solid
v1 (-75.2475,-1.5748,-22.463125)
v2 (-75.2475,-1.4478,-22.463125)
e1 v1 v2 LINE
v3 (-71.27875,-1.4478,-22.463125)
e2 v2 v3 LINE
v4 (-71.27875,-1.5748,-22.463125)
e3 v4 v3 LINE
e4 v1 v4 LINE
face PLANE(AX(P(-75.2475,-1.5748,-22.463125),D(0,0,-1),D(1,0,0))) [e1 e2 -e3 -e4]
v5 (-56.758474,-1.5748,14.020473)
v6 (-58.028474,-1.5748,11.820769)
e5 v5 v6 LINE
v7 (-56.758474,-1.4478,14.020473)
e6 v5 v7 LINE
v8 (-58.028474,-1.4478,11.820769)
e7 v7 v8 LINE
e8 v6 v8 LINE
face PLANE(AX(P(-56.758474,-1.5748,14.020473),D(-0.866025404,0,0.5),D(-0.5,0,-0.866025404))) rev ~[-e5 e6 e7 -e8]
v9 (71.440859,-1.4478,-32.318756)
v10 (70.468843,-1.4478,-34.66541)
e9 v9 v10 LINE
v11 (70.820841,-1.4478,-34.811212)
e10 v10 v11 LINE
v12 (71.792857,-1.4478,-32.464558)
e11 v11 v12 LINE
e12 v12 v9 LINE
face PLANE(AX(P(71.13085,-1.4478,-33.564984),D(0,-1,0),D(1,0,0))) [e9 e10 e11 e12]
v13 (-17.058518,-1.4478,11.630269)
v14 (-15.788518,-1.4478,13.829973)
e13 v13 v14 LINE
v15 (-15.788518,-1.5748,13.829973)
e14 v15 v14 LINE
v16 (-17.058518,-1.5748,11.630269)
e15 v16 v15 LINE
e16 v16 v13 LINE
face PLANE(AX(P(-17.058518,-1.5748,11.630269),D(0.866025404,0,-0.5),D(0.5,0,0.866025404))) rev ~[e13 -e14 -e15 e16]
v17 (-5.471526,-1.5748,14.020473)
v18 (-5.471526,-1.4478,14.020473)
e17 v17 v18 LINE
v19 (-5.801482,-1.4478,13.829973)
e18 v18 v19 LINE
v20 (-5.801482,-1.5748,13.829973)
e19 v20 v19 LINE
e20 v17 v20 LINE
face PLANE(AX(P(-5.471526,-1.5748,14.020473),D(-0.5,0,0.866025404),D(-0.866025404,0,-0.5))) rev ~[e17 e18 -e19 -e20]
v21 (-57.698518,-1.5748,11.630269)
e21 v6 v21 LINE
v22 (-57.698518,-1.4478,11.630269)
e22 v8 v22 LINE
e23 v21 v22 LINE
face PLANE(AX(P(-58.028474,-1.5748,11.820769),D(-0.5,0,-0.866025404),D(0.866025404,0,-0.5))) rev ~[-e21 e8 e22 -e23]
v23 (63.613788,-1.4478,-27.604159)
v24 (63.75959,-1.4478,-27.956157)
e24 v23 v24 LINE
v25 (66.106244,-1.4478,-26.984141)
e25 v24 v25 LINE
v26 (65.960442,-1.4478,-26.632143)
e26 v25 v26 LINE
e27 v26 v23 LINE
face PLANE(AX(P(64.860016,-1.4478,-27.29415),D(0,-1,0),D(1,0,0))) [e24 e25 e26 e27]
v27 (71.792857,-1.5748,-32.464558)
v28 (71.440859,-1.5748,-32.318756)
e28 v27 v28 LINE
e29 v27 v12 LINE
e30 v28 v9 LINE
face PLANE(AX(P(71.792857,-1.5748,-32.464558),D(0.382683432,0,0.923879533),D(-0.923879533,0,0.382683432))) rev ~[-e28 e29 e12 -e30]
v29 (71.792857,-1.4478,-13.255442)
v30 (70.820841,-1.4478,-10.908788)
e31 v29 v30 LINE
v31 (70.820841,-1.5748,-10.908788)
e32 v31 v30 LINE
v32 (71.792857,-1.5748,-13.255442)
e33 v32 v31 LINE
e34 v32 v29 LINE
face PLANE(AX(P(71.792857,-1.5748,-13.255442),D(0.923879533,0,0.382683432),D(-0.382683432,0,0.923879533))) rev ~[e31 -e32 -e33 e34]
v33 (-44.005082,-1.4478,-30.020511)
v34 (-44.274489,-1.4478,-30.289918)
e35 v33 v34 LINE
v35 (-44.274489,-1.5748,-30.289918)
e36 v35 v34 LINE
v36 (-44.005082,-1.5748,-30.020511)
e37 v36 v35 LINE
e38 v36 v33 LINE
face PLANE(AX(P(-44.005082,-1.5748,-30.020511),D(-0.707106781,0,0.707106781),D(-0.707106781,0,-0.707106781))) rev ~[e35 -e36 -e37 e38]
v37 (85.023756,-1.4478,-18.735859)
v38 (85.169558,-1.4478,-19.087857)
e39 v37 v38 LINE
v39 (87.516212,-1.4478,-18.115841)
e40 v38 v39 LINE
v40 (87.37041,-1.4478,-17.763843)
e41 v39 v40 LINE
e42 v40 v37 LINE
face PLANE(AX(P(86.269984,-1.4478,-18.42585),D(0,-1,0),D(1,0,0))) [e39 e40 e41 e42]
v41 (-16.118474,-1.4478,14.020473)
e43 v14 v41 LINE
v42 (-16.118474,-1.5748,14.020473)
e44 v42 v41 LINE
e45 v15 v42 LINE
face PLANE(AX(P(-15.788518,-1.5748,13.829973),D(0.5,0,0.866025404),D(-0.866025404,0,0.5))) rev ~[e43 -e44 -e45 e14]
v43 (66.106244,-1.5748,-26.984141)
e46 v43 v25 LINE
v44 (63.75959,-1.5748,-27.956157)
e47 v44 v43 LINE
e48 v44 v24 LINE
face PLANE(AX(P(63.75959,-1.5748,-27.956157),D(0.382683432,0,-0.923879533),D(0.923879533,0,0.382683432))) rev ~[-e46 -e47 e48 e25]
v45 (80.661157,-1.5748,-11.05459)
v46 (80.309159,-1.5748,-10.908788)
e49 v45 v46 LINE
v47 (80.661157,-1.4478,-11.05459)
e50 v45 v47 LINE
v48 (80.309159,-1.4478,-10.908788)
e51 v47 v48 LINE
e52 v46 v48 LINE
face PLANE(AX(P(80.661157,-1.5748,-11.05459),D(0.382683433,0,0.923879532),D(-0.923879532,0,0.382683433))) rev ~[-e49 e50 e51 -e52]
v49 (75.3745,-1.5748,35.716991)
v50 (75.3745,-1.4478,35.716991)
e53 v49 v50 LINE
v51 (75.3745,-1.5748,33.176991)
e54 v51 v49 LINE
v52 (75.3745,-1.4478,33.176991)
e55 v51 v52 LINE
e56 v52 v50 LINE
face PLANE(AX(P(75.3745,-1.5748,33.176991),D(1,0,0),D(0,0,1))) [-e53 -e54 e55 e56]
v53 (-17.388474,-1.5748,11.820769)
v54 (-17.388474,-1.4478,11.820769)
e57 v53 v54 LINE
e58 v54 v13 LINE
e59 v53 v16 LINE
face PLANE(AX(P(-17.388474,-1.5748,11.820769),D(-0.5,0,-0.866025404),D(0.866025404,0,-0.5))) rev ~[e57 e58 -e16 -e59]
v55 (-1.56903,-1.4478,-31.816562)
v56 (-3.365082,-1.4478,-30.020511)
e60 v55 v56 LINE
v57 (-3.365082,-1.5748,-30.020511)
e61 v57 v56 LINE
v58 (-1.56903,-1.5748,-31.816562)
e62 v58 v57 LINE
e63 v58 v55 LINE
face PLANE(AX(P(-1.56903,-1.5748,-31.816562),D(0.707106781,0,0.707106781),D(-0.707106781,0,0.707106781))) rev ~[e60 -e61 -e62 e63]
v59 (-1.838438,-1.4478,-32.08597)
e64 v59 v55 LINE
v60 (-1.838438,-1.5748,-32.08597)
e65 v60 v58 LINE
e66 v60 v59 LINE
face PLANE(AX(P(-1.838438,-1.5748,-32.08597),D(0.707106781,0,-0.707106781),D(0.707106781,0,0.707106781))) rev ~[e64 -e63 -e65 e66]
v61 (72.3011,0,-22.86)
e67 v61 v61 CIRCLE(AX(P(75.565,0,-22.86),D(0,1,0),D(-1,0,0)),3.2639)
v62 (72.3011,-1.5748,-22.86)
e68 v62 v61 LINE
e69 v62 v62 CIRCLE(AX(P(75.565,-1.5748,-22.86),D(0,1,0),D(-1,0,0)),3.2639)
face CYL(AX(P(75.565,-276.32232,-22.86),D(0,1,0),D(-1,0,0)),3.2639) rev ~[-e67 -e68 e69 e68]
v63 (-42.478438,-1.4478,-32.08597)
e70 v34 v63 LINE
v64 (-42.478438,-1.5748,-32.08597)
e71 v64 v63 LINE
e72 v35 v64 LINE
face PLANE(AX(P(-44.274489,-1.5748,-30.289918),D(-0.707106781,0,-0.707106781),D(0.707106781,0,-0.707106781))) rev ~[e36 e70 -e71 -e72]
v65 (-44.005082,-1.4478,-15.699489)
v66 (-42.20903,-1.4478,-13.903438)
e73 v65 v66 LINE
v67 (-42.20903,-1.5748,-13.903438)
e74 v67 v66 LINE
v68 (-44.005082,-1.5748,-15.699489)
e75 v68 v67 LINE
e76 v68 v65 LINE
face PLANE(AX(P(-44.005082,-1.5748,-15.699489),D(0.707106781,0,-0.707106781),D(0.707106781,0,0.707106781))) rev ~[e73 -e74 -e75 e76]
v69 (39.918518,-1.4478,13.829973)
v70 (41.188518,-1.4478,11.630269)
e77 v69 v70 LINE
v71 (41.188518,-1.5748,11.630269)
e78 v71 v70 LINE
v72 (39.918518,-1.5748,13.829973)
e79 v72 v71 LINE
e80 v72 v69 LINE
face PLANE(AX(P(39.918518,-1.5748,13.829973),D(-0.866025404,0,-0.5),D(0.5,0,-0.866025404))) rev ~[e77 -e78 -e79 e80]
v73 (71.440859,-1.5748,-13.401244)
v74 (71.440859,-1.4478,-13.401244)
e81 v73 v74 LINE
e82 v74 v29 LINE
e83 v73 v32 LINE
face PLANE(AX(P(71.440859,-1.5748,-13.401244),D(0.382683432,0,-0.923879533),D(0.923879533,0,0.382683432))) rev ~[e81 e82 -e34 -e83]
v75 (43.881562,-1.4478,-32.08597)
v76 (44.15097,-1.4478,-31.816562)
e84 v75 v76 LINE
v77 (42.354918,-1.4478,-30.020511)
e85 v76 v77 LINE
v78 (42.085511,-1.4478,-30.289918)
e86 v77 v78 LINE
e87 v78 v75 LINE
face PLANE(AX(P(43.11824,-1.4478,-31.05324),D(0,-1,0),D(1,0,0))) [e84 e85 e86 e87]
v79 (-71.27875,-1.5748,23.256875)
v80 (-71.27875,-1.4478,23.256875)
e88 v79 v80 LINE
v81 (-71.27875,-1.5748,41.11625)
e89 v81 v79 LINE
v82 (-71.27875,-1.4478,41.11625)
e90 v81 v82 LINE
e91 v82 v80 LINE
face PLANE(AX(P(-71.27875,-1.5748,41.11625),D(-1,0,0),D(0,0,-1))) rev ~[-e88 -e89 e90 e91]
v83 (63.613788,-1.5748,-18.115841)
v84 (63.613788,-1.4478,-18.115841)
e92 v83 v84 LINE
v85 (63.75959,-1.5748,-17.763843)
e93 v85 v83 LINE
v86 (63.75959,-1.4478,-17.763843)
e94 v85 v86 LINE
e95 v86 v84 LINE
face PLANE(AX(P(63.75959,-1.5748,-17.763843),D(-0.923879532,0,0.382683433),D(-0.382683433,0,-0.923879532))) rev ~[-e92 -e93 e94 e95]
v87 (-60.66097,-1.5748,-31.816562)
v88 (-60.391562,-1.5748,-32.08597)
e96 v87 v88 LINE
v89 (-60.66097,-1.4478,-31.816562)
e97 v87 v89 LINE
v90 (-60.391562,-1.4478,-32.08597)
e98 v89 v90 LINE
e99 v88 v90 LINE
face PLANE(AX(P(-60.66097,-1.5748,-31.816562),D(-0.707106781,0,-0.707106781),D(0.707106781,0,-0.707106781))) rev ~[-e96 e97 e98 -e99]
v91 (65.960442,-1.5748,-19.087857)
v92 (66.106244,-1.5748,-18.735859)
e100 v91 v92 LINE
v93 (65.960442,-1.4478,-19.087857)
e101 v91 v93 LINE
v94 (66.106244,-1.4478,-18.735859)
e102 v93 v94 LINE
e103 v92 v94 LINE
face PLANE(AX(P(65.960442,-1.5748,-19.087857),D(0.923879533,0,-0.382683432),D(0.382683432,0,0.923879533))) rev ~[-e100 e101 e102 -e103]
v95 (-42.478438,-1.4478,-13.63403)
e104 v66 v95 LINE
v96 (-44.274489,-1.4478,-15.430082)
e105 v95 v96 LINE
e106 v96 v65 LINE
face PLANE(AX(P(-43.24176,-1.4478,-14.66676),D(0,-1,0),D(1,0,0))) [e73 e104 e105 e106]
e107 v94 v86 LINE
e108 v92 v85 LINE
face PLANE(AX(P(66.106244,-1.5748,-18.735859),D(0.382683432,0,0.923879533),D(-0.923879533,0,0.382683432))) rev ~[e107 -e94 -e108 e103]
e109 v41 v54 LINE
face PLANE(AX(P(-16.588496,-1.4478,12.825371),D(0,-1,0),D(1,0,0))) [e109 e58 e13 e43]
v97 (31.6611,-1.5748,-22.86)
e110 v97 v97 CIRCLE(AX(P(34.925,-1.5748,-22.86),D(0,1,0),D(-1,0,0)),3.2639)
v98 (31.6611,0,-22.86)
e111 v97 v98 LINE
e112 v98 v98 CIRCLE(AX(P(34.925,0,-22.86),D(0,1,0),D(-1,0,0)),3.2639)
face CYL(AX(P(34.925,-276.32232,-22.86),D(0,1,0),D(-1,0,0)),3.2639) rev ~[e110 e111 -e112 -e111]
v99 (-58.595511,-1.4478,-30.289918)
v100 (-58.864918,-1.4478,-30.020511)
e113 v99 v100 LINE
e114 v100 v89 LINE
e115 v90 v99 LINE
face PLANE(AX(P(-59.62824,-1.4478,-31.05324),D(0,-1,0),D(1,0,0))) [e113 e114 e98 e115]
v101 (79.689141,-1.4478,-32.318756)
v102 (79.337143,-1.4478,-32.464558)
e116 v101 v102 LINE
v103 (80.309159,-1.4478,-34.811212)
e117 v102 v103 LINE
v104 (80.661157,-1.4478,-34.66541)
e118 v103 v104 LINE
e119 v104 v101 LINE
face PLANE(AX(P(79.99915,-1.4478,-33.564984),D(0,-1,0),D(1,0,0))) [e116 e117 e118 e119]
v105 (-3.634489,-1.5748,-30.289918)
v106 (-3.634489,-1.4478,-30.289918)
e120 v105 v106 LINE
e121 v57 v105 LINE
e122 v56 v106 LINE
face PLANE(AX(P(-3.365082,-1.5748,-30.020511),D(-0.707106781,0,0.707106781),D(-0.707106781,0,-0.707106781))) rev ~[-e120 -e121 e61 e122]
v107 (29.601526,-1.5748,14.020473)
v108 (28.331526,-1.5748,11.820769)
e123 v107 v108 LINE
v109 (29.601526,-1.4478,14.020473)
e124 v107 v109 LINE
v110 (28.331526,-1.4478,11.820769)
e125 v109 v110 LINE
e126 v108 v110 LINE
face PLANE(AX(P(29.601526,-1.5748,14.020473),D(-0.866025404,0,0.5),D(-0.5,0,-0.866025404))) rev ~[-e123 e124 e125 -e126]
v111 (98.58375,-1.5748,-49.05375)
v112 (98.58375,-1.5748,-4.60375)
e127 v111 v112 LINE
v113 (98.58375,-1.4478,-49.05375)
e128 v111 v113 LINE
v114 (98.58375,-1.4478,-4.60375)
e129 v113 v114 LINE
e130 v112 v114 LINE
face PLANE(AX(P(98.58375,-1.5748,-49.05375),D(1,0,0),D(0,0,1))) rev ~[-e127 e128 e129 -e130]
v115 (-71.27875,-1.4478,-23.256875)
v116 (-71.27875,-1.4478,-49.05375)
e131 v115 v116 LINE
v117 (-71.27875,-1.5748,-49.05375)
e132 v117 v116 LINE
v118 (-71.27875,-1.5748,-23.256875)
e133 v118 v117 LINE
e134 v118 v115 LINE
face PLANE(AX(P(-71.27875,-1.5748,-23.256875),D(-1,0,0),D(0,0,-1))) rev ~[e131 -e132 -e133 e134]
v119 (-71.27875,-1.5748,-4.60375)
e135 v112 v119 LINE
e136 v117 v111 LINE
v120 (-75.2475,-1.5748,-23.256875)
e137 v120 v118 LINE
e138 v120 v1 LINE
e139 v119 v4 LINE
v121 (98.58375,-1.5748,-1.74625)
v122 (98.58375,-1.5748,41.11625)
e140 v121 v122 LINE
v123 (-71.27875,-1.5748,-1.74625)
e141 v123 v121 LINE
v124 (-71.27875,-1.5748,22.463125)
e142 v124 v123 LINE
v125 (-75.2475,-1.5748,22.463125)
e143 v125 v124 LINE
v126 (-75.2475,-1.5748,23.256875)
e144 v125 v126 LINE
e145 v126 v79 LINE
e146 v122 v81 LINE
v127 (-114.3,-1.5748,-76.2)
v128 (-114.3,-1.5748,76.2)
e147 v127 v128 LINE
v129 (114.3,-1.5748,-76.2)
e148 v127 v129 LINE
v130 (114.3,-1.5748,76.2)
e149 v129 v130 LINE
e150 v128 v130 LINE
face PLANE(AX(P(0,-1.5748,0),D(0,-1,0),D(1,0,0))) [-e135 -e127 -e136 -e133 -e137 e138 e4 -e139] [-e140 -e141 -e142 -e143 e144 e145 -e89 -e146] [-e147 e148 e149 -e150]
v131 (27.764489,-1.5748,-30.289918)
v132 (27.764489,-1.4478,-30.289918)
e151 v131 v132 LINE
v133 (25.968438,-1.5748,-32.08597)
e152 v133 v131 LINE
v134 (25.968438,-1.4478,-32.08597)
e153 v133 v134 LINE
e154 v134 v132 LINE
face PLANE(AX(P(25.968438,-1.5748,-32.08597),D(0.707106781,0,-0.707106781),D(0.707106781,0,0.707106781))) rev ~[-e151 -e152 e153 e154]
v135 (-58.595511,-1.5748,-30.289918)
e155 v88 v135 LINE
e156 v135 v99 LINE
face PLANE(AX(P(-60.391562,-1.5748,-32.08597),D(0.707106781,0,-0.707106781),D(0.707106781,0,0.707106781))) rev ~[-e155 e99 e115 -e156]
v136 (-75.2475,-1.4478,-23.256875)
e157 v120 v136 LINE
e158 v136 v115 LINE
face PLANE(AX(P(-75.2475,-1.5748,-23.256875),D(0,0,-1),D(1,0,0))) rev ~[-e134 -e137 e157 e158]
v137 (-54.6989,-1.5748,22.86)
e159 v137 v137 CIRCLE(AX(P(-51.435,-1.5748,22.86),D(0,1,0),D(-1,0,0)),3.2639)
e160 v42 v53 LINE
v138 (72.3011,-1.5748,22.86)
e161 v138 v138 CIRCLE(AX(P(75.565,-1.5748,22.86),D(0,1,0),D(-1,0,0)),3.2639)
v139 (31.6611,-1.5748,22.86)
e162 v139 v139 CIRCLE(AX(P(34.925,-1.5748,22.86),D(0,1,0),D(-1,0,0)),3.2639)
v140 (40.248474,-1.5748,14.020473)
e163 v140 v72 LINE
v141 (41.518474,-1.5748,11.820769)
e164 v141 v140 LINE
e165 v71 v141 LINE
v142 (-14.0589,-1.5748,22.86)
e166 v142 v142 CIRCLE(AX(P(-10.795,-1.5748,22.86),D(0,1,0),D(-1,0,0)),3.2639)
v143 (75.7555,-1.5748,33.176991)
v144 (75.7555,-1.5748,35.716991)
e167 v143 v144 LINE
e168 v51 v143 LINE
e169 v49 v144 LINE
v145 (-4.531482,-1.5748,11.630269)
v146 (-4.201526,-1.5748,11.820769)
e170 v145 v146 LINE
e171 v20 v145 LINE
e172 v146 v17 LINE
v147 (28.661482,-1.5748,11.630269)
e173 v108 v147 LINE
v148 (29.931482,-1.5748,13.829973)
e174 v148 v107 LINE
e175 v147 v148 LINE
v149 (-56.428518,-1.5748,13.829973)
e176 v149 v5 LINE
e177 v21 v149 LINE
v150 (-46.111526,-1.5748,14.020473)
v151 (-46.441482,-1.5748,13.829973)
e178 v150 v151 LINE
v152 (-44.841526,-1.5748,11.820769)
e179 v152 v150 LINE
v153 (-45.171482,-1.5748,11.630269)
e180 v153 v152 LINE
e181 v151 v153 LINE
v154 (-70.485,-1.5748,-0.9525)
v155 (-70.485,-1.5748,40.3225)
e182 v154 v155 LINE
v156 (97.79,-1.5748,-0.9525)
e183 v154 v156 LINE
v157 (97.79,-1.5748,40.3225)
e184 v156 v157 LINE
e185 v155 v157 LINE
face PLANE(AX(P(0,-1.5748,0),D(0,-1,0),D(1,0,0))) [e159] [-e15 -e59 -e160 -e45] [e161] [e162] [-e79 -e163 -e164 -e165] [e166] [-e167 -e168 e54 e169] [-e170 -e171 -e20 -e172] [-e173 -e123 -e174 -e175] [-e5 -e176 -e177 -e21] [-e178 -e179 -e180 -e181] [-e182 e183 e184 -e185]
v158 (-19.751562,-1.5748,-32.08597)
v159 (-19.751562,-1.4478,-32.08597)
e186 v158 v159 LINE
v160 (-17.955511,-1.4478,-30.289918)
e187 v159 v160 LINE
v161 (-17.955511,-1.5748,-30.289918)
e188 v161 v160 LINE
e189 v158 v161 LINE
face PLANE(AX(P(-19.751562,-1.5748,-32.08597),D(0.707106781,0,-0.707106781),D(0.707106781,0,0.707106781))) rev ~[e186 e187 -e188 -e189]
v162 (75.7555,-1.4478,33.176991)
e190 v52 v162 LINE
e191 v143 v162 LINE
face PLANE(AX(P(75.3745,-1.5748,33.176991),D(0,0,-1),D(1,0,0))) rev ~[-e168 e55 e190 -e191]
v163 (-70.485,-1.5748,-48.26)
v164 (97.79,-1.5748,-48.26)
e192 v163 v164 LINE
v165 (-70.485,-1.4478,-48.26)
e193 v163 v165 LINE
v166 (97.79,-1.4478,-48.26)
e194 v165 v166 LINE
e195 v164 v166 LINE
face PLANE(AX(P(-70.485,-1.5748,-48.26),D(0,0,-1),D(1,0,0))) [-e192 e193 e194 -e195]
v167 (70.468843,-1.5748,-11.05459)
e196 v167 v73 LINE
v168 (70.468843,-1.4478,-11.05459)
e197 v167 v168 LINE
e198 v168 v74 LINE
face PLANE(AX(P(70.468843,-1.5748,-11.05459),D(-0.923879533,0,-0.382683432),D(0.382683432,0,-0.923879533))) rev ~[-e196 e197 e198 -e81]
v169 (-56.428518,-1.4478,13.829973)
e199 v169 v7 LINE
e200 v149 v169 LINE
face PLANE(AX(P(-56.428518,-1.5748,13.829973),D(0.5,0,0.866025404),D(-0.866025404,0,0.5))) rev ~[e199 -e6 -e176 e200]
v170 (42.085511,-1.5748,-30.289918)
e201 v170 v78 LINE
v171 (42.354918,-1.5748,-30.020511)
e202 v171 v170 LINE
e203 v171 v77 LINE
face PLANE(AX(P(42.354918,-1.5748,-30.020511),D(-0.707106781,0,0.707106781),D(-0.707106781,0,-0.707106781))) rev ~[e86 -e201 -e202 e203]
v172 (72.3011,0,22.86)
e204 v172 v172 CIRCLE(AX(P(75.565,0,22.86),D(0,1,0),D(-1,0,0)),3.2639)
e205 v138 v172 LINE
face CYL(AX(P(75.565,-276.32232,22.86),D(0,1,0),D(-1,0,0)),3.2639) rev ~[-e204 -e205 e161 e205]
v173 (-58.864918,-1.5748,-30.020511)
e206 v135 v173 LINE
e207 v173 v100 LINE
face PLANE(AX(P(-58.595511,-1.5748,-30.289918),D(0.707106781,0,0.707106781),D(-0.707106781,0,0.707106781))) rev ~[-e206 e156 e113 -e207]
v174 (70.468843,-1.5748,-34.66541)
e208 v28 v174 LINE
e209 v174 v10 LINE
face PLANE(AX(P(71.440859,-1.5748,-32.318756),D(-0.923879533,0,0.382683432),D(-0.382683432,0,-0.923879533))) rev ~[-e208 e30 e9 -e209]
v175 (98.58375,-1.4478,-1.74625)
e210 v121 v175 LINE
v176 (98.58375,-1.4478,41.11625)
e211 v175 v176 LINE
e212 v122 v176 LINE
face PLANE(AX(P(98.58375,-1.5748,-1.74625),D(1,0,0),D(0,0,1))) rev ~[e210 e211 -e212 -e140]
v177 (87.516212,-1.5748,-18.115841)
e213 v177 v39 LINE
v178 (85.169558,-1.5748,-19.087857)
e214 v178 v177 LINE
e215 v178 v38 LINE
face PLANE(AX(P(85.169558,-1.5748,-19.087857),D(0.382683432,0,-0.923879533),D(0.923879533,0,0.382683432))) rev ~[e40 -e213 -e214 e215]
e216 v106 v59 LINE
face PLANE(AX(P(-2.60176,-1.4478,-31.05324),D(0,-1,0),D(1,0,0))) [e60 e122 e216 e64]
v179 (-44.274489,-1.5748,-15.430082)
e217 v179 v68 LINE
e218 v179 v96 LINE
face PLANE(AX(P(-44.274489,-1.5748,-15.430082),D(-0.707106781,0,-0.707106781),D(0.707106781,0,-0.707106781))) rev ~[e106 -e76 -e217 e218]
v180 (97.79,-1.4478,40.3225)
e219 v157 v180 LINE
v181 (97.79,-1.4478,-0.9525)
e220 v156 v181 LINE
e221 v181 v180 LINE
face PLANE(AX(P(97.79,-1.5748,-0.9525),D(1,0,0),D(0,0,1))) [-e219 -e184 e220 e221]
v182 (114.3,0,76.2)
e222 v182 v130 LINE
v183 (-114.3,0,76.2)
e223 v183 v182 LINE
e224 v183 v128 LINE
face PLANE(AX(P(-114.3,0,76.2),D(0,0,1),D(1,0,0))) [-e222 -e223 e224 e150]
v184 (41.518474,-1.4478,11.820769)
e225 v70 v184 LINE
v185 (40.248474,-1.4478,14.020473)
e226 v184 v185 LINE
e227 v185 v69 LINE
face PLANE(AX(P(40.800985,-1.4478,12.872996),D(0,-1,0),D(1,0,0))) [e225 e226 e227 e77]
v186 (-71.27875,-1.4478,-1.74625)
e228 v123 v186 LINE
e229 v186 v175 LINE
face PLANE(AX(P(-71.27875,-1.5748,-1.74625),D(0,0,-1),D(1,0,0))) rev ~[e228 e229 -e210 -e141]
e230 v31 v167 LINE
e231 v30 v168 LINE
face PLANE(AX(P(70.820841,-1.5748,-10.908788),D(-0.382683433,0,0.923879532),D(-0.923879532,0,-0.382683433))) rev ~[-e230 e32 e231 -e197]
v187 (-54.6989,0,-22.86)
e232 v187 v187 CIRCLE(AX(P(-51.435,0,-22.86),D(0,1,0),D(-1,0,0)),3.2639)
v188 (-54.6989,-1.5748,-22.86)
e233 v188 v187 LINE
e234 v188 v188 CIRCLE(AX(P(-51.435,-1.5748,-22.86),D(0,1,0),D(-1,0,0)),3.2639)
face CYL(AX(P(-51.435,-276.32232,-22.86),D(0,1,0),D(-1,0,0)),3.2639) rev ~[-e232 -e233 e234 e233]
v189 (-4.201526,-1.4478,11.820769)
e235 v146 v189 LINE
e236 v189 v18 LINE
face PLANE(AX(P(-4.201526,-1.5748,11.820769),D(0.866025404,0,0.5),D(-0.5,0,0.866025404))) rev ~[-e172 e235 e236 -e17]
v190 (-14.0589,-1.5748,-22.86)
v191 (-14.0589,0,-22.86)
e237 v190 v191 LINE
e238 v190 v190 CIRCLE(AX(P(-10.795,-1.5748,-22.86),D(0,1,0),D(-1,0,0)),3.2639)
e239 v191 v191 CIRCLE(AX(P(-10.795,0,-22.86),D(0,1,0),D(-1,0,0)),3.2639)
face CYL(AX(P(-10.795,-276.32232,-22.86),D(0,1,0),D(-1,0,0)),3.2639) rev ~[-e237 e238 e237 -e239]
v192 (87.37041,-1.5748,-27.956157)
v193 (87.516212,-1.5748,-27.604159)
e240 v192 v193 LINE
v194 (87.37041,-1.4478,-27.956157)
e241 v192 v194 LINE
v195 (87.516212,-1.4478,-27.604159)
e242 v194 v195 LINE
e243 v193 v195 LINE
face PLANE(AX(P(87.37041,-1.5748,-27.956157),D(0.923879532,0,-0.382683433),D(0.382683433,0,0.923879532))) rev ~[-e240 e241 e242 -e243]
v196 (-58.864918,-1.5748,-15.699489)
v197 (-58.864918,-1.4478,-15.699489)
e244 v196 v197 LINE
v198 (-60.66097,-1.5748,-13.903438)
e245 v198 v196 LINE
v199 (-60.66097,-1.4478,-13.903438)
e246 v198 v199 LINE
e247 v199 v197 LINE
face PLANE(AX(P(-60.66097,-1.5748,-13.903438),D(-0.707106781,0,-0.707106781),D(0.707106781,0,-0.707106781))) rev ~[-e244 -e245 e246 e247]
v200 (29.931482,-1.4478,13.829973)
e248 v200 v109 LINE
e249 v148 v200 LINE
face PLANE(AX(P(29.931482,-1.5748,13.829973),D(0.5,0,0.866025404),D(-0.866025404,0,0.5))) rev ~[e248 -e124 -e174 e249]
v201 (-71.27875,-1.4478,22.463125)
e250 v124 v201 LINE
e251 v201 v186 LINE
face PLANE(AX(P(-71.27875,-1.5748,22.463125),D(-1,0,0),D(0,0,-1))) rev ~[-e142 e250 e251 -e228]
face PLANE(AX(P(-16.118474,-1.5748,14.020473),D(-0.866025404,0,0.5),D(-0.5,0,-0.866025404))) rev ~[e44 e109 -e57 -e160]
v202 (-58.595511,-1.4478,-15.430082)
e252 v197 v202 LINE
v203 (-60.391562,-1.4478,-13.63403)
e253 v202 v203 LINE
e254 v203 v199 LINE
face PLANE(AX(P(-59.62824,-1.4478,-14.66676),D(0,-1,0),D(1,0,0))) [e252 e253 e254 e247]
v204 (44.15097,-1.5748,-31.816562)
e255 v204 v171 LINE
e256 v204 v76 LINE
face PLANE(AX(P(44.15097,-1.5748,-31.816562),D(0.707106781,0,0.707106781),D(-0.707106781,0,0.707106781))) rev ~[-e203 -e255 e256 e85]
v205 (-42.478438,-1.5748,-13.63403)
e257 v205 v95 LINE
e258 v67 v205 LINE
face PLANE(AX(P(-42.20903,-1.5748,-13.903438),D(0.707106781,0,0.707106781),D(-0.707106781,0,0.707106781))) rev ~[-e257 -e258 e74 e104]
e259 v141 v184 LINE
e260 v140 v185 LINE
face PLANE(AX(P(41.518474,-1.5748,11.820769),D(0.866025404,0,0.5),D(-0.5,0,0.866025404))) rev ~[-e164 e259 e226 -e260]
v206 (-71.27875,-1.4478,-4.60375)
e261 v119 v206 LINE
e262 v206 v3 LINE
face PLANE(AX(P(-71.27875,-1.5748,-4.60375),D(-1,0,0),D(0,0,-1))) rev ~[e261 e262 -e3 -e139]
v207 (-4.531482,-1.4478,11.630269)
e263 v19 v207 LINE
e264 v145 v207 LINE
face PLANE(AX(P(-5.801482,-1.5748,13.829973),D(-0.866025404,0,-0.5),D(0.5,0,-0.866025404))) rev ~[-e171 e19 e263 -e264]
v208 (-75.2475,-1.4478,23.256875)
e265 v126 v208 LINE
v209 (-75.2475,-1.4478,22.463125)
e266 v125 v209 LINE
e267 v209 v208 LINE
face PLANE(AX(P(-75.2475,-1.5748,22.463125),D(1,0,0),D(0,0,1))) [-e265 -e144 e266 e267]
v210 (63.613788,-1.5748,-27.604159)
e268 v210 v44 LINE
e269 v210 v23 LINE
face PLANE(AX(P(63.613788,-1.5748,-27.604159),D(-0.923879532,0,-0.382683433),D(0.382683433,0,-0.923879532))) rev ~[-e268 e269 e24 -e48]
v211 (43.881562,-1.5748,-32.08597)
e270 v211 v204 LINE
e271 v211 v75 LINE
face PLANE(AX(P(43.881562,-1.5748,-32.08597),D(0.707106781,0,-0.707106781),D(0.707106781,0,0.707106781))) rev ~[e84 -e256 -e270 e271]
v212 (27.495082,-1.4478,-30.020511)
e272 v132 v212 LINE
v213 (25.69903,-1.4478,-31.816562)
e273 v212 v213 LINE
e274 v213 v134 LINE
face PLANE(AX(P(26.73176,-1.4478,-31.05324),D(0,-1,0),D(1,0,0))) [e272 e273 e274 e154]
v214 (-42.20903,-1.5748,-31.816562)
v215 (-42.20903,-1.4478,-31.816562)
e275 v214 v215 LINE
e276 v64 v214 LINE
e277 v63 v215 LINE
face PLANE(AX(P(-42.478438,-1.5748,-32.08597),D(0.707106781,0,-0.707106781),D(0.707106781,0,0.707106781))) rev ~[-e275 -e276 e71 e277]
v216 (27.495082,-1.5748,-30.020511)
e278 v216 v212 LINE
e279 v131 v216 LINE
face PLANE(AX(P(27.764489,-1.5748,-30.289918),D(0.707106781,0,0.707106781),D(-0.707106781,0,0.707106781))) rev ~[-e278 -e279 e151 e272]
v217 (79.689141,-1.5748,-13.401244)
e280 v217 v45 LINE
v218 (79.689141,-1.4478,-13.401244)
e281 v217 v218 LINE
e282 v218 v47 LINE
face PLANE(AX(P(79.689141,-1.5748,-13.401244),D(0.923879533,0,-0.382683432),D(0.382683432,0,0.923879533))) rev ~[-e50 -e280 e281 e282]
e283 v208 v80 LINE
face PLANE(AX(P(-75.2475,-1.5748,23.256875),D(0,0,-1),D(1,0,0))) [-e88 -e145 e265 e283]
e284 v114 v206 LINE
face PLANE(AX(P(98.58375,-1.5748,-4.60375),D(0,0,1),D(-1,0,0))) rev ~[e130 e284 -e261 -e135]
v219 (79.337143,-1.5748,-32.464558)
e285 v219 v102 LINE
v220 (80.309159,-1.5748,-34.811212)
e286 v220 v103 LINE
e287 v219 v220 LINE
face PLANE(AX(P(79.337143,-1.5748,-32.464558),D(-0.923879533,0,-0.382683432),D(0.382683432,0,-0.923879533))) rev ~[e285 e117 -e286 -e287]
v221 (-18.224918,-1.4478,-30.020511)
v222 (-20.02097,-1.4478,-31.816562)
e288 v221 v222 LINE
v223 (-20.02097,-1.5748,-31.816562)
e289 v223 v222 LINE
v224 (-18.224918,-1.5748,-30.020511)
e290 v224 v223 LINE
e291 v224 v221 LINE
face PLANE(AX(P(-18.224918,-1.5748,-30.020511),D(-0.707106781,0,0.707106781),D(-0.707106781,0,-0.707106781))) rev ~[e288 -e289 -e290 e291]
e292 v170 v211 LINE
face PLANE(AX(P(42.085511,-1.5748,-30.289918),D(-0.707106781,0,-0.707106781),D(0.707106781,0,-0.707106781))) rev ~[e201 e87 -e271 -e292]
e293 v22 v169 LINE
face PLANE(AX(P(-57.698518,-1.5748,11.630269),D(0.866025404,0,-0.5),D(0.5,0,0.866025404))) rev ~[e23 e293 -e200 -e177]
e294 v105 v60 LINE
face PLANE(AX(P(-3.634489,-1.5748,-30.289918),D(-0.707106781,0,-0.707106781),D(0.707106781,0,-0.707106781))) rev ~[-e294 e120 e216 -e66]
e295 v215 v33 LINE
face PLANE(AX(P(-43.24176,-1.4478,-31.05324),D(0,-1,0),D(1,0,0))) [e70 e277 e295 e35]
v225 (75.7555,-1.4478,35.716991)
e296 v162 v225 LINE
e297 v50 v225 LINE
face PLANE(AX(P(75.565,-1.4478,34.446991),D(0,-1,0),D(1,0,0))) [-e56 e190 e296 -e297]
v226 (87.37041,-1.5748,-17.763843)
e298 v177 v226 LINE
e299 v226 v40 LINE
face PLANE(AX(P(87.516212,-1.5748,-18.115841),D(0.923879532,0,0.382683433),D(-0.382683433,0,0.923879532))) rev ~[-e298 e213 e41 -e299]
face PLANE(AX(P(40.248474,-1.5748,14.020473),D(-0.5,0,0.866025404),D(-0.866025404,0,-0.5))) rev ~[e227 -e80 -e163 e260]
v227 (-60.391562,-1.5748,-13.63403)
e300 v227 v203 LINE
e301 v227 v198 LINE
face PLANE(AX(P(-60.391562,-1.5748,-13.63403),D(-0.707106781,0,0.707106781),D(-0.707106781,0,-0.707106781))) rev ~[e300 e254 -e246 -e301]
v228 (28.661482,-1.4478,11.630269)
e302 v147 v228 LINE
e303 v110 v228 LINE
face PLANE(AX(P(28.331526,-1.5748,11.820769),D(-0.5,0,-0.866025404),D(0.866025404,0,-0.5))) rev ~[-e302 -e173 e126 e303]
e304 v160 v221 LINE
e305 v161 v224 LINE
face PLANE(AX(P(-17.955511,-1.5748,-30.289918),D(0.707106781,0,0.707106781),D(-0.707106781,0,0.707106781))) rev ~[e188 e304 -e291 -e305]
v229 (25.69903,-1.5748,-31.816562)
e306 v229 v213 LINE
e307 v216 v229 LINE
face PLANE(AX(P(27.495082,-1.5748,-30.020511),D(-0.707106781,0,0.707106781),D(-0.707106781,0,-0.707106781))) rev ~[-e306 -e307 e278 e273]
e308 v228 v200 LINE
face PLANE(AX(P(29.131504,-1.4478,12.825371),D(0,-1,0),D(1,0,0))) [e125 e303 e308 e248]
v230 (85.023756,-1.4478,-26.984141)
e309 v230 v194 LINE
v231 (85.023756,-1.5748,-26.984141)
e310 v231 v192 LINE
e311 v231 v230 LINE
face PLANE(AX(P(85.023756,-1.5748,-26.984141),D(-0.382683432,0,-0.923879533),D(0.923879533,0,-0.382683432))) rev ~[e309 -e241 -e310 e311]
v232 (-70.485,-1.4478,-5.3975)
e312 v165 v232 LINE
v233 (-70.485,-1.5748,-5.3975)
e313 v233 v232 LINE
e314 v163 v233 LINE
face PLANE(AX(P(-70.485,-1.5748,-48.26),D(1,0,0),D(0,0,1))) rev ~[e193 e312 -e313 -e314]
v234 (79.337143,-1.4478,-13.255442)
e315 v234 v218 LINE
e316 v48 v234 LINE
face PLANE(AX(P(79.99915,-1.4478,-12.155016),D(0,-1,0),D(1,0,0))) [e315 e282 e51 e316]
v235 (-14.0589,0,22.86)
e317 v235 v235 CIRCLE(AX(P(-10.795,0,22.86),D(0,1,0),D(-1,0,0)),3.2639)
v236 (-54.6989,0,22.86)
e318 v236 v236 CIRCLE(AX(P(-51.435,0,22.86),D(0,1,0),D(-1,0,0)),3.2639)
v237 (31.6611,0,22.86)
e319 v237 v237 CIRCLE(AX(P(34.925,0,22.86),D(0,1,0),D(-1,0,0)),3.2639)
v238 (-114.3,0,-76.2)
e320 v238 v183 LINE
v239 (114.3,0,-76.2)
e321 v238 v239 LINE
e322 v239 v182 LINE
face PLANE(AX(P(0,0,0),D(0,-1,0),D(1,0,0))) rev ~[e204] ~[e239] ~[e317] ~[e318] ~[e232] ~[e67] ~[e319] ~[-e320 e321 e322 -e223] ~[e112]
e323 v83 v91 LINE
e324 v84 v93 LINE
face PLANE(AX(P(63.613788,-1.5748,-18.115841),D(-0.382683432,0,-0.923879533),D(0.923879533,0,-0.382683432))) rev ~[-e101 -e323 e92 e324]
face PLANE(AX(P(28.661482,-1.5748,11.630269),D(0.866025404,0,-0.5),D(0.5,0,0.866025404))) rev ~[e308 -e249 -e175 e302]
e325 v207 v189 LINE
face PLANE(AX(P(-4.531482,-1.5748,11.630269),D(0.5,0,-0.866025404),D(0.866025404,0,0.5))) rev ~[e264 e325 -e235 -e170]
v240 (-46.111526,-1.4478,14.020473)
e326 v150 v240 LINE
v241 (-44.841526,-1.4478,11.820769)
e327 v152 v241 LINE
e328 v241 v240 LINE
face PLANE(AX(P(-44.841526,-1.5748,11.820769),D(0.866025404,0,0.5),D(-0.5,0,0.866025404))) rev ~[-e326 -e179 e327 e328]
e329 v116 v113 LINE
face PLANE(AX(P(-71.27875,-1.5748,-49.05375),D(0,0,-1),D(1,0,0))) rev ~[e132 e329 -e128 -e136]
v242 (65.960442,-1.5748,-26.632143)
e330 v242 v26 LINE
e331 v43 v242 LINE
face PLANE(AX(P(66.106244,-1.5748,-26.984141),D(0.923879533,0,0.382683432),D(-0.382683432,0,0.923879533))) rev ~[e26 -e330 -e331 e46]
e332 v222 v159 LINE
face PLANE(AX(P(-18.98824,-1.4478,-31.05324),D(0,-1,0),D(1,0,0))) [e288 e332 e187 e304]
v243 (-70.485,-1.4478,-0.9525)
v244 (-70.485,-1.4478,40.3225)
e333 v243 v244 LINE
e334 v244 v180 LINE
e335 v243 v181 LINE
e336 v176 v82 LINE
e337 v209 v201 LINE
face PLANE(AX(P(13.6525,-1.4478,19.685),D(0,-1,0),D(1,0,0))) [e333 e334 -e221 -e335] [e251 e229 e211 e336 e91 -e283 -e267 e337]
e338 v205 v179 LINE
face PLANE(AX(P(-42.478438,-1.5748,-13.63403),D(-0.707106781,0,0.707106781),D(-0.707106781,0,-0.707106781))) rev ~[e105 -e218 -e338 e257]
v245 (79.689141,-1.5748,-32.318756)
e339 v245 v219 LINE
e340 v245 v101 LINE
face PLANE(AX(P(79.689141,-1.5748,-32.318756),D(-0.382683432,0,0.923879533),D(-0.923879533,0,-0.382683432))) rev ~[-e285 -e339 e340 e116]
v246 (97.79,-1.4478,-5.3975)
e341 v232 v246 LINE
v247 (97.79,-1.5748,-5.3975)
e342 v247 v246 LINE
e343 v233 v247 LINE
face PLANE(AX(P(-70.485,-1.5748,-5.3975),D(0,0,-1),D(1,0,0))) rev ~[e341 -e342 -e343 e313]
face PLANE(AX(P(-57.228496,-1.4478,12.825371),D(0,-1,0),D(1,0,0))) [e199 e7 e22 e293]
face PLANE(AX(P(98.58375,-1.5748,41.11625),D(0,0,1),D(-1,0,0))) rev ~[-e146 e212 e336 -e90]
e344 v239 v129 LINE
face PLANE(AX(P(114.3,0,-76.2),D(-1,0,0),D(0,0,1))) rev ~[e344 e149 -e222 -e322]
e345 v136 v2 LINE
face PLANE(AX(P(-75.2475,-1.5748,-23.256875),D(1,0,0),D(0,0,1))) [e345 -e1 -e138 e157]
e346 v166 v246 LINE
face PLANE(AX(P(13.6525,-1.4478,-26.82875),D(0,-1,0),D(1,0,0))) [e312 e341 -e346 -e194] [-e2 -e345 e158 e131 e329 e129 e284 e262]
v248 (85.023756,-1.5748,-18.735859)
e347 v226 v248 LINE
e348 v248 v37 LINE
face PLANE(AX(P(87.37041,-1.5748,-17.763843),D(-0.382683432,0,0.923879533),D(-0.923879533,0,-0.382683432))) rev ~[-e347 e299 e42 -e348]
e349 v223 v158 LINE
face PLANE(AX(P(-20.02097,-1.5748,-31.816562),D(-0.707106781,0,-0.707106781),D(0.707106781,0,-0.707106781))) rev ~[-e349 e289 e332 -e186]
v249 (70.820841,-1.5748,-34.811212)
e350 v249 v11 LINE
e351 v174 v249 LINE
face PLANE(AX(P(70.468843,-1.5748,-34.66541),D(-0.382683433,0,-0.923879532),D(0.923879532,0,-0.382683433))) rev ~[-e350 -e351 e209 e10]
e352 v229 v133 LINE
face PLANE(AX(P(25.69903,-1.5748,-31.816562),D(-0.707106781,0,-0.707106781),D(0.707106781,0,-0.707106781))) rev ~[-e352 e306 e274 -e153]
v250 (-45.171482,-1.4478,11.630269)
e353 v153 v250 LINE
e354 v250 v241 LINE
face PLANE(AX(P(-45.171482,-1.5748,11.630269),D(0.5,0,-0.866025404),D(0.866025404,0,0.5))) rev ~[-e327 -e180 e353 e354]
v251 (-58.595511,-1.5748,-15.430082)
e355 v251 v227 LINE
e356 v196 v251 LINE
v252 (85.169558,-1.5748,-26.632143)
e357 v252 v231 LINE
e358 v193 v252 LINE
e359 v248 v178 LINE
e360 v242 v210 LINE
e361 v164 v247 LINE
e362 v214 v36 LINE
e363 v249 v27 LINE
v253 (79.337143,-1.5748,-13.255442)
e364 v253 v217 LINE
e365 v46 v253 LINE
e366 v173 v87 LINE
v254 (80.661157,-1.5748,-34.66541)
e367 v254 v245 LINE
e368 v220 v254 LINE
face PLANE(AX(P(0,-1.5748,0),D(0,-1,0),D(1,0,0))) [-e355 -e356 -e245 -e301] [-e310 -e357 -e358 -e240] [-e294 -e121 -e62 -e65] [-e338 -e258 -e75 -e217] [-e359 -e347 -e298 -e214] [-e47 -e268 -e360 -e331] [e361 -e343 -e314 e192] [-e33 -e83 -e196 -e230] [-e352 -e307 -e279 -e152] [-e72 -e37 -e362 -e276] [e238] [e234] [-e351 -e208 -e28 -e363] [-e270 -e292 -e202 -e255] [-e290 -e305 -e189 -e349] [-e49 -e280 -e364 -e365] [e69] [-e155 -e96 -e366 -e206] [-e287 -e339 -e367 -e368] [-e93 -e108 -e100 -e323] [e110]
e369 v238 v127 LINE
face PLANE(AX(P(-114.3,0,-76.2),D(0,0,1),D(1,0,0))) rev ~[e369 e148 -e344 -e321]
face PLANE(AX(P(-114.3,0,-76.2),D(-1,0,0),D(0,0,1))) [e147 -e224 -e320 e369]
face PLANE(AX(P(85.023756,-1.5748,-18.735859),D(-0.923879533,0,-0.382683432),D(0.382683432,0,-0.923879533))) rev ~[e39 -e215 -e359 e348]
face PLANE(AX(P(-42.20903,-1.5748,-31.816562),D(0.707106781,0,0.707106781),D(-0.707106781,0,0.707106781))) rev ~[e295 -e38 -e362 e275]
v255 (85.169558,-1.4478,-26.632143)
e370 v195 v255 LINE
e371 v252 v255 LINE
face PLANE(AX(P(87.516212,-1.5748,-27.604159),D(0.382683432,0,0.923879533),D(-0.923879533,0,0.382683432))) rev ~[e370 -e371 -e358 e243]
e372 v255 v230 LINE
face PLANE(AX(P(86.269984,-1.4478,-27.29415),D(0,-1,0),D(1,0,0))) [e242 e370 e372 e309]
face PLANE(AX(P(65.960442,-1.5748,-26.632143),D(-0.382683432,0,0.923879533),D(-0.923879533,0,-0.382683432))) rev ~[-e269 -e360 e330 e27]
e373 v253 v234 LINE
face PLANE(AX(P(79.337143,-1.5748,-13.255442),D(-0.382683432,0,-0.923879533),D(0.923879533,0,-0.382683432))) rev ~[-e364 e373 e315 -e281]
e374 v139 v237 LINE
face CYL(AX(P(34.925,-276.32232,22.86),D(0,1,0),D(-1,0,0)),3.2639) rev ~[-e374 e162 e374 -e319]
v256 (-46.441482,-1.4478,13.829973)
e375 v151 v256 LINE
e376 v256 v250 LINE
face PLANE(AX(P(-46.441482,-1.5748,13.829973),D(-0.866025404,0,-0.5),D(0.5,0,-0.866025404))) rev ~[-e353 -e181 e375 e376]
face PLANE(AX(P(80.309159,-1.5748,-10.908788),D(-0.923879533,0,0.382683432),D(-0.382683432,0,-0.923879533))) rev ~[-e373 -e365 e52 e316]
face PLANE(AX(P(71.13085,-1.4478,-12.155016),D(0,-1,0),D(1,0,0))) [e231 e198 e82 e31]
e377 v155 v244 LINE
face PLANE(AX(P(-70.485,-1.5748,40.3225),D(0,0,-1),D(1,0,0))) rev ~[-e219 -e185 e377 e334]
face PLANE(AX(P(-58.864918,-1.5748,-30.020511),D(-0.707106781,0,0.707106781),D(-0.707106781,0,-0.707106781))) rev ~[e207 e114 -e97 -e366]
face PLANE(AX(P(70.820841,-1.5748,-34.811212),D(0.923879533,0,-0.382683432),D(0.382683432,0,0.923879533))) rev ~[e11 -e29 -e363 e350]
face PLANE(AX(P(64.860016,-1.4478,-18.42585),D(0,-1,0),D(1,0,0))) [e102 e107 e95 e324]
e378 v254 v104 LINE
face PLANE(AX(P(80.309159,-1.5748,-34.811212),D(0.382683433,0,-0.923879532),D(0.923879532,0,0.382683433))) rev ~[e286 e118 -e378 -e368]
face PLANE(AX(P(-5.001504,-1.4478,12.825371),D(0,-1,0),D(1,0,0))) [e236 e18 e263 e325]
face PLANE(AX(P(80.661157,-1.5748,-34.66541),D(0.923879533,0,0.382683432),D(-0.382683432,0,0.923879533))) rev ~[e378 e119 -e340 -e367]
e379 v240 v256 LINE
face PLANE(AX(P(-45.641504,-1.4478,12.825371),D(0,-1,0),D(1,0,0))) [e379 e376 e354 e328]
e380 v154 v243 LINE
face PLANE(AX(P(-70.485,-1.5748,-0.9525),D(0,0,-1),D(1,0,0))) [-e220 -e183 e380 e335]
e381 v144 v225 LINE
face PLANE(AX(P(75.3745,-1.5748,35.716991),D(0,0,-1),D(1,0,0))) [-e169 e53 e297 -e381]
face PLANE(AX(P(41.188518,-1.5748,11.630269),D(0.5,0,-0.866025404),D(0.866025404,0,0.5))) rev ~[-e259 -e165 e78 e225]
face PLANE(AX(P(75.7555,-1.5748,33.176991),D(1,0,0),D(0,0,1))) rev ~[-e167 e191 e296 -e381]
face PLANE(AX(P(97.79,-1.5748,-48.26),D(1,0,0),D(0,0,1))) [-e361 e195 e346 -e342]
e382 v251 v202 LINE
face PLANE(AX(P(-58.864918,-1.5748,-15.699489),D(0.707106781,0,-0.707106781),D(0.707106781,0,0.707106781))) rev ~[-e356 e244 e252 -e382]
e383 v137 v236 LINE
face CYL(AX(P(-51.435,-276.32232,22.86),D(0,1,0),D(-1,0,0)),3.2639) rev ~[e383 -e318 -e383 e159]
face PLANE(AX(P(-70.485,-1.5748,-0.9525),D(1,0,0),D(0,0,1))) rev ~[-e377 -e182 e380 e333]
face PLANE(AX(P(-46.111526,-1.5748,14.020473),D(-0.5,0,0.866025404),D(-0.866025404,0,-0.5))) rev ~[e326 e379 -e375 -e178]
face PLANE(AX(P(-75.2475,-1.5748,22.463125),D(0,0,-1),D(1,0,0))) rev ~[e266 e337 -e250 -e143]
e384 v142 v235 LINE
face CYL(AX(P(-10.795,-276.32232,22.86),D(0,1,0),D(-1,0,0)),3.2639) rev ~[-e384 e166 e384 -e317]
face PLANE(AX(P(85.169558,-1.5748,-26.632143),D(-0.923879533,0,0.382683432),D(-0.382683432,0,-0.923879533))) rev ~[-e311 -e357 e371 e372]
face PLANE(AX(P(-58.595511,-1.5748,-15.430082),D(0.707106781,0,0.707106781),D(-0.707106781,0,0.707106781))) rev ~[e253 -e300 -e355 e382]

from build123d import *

# Parameters (mm, degrees)
F0_W     = 228.6
F0_H     = 152.4
F1_DEPTH = 1.5748
F3_D     = 6.5278
F5_W     = 0.381
F5_H     = 2.54
F6_DEPTH = 0.127
F7_W     = 168.275
F7_H     = 41.275
F7_W_2   = 3.96875
F7_H_2   = 0.79375
F7_H_3   = 42.8625
F8_DEPTH = 0.127


with BuildPart() as f1:
    # F0 (on Front) → F1 (new body)
    with BuildSketch(Plane.XZ):
        Rectangle(F0_W, F0_H)
    extrude(amount=F1_DEPTH)

    # F3 (through all)
    with Locations(Plane.XZ.offset(1.5748)):
        with Locations((-51.435, 22.86), (-10.795, 22.86), (34.925, 22.86), (75.565, 22.86), (75.565, -22.86), (34.925, -22.86), (-10.795, -22.86), (-51.435, -22.86)):
            Hole(F3_D / 2)

    # F5 (on face) → F6 (cut)
    with BuildSketch(Plane.XZ.offset(1.5748)):
        Polygon((-42.2090303616, -31.8165619547), (-44.0050815859, -30.0205107305), (-44.2744892695, -30.2899184141), (-42.4784380453, -32.0859696384), align=None)
        Polygon((-42.2090303616, -13.9034380453), (-42.4784380453, -13.6340303616), (-44.2744892695, -15.4300815859), (-44.0050815859, -15.6994892695), align=None)
        Polygon((80.3091585435, -10.9087876125), (79.3371426253, -13.2554416251), (79.6891407272, -13.4012440128), (80.6611566454, -11.0545900003), align=None)
        Polygon((85.0237559872, -18.7358592728), (85.1695583749, -19.0878573747), (87.5162123875, -18.1158414565), (87.3704099997, -17.7638433546), align=None)
        Polygon((85.1695583749, -26.6321426253), (85.0237559872, -26.9841407272), (87.3704099997, -27.9561566454), (87.5162123875, -27.6041585435), align=None)
        Polygon((79.6891407272, -32.3187559872), (79.3371426253, -32.4645583749), (80.3091585435, -34.8112123875), (80.6611566454, -34.6654099997), align=None)
        Polygon((71.7928573747, -32.4645583749), (71.4408592728, -32.3187559872), (70.4688433546, -34.6654099997), (70.8208414565, -34.8112123875), align=None)
        Polygon((66.1062440128, -26.9841407272), (65.9604416251, -26.6321426253), (63.6137876125, -27.6041585435), (63.7595900003, -27.9561566454), align=None)
        Polygon((65.9604416251, -19.0878573747), (66.1062440128, -18.7358592728), (63.7595900003, -17.7638433546), (63.6137876125, -18.1158414565), align=None)
        Polygon((71.4408592728, -13.4012440128), (71.7928573747, -13.2554416251), (70.8208414565, -10.9087876125), (70.4688433546, -11.0545900003), align=None)
        Polygon((27.4950815859, -30.0205107305), (25.6990303616, -31.8165619547), (25.9684380453, -32.0859696384), (27.7644892695, -30.2899184141), align=None)
        Polygon((44.1509696384, -31.8165619547), (42.3549184141, -30.0205107305), (42.0855107305, -30.2899184141), (43.8815619547, -32.0859696384), align=None)
        Polygon((-18.2249184141, -30.0205107305), (-20.0209696384, -31.8165619547), (-19.7515619547, -32.0859696384), (-17.9555107305, -30.2899184141), align=None)
        Polygon((-1.5690303616, -31.8165619547), (-3.3650815859, -30.0205107305), (-3.6344892695, -30.2899184141), (-1.8384380453, -32.0859696384), align=None)
        Polygon((-58.8649184141, -30.0205107305), (-60.6609696384, -31.8165619547), (-60.3915619547, -32.0859696384), (-58.5955107305, -30.2899184141), align=None)
        Polygon((-16.1184735337, 14.0204733668), (-17.3884735337, 11.8207688412), (-17.0585178549, 11.6302688412), (-15.7885178549, 13.8299733668), align=None)
        Polygon((-4.2015264663, 11.8207688412), (-5.4715264663, 14.0204733668), (-5.8014821451, 13.8299733668), (-4.5314821451, 11.6302688412), align=None)
        Polygon((-56.7584735337, 14.0204733668), (-58.0284735337, 11.8207688412), (-57.6985178549, 11.6302688412), (-56.4285178549, 13.8299733668), align=None)
        Polygon((-44.8415264663, 11.8207688412), (-46.1115264663, 14.0204733668), (-46.4414821451, 13.8299733668), (-45.1714821451, 11.6302688412), align=None)
        with Locations((75.565, 34.4469913886)):
            Rectangle(F5_W, F5_H)
        Polygon((40.2484735337, 14.0204733668), (40.0834956943, 13.9252233668), (41.3534956943, 11.7255188412), (41.5184735337, 11.8207688412), align=None)
        Polygon((41.3534956943, 11.7255188412), (40.0834956943, 13.9252233668), (39.9185178549, 13.8299733668), (41.1885178549, 11.6302688412), align=None)
        Polygon((29.6015264663, 14.0204733668), (28.3315264663, 11.8207688412), (28.6614821451, 11.6302688412), (29.9314821451, 13.8299733668), align=None)
        Polygon((-58.5955107305, -15.4300815859), (-60.3915619547, -13.6340303616), (-60.6609696384, -13.9034380453), (-58.8649184141, -15.6994892695), align=None)
    extrude(amount=-F6_DEPTH, mode=Mode.SUBTRACT)

    # F7 (on face) → F8 (cut)
    with BuildSketch(Plane.XZ.offset(1.5748)):
        Polygon((98.58375, 41.11625), (-71.27875, 41.11625), (-71.27875, 23.256875), (-71.27875, 22.463125), (-71.27875, -1.74625), (98.58375, -1.74625), align=None)
        with Locations((13.6525, 19.685)):
            Rectangle(F7_W, F7_H, mode=Mode.SUBTRACT)
        with Locations((-73.263125, 22.86)):
            Rectangle(F7_W_2, F7_H_2)
        Polygon((98.58375, -4.60375), (-71.27875, -4.60375), (-71.27875, -22.463125), (-71.27875, -23.256875), (-71.27875, -49.05375), (98.58375, -49.05375), align=None)
        with Locations((13.6525, -26.82875)):
            Rectangle(F7_W, F7_H_3, mode=Mode.SUBTRACT)
        with Locations((-73.263125, -22.86)):
            Rectangle(F7_W_2, F7_H_2)
    extrude(amount=-F8_DEPTH, mode=Mode.SUBTRACT)


solid = f1.part
